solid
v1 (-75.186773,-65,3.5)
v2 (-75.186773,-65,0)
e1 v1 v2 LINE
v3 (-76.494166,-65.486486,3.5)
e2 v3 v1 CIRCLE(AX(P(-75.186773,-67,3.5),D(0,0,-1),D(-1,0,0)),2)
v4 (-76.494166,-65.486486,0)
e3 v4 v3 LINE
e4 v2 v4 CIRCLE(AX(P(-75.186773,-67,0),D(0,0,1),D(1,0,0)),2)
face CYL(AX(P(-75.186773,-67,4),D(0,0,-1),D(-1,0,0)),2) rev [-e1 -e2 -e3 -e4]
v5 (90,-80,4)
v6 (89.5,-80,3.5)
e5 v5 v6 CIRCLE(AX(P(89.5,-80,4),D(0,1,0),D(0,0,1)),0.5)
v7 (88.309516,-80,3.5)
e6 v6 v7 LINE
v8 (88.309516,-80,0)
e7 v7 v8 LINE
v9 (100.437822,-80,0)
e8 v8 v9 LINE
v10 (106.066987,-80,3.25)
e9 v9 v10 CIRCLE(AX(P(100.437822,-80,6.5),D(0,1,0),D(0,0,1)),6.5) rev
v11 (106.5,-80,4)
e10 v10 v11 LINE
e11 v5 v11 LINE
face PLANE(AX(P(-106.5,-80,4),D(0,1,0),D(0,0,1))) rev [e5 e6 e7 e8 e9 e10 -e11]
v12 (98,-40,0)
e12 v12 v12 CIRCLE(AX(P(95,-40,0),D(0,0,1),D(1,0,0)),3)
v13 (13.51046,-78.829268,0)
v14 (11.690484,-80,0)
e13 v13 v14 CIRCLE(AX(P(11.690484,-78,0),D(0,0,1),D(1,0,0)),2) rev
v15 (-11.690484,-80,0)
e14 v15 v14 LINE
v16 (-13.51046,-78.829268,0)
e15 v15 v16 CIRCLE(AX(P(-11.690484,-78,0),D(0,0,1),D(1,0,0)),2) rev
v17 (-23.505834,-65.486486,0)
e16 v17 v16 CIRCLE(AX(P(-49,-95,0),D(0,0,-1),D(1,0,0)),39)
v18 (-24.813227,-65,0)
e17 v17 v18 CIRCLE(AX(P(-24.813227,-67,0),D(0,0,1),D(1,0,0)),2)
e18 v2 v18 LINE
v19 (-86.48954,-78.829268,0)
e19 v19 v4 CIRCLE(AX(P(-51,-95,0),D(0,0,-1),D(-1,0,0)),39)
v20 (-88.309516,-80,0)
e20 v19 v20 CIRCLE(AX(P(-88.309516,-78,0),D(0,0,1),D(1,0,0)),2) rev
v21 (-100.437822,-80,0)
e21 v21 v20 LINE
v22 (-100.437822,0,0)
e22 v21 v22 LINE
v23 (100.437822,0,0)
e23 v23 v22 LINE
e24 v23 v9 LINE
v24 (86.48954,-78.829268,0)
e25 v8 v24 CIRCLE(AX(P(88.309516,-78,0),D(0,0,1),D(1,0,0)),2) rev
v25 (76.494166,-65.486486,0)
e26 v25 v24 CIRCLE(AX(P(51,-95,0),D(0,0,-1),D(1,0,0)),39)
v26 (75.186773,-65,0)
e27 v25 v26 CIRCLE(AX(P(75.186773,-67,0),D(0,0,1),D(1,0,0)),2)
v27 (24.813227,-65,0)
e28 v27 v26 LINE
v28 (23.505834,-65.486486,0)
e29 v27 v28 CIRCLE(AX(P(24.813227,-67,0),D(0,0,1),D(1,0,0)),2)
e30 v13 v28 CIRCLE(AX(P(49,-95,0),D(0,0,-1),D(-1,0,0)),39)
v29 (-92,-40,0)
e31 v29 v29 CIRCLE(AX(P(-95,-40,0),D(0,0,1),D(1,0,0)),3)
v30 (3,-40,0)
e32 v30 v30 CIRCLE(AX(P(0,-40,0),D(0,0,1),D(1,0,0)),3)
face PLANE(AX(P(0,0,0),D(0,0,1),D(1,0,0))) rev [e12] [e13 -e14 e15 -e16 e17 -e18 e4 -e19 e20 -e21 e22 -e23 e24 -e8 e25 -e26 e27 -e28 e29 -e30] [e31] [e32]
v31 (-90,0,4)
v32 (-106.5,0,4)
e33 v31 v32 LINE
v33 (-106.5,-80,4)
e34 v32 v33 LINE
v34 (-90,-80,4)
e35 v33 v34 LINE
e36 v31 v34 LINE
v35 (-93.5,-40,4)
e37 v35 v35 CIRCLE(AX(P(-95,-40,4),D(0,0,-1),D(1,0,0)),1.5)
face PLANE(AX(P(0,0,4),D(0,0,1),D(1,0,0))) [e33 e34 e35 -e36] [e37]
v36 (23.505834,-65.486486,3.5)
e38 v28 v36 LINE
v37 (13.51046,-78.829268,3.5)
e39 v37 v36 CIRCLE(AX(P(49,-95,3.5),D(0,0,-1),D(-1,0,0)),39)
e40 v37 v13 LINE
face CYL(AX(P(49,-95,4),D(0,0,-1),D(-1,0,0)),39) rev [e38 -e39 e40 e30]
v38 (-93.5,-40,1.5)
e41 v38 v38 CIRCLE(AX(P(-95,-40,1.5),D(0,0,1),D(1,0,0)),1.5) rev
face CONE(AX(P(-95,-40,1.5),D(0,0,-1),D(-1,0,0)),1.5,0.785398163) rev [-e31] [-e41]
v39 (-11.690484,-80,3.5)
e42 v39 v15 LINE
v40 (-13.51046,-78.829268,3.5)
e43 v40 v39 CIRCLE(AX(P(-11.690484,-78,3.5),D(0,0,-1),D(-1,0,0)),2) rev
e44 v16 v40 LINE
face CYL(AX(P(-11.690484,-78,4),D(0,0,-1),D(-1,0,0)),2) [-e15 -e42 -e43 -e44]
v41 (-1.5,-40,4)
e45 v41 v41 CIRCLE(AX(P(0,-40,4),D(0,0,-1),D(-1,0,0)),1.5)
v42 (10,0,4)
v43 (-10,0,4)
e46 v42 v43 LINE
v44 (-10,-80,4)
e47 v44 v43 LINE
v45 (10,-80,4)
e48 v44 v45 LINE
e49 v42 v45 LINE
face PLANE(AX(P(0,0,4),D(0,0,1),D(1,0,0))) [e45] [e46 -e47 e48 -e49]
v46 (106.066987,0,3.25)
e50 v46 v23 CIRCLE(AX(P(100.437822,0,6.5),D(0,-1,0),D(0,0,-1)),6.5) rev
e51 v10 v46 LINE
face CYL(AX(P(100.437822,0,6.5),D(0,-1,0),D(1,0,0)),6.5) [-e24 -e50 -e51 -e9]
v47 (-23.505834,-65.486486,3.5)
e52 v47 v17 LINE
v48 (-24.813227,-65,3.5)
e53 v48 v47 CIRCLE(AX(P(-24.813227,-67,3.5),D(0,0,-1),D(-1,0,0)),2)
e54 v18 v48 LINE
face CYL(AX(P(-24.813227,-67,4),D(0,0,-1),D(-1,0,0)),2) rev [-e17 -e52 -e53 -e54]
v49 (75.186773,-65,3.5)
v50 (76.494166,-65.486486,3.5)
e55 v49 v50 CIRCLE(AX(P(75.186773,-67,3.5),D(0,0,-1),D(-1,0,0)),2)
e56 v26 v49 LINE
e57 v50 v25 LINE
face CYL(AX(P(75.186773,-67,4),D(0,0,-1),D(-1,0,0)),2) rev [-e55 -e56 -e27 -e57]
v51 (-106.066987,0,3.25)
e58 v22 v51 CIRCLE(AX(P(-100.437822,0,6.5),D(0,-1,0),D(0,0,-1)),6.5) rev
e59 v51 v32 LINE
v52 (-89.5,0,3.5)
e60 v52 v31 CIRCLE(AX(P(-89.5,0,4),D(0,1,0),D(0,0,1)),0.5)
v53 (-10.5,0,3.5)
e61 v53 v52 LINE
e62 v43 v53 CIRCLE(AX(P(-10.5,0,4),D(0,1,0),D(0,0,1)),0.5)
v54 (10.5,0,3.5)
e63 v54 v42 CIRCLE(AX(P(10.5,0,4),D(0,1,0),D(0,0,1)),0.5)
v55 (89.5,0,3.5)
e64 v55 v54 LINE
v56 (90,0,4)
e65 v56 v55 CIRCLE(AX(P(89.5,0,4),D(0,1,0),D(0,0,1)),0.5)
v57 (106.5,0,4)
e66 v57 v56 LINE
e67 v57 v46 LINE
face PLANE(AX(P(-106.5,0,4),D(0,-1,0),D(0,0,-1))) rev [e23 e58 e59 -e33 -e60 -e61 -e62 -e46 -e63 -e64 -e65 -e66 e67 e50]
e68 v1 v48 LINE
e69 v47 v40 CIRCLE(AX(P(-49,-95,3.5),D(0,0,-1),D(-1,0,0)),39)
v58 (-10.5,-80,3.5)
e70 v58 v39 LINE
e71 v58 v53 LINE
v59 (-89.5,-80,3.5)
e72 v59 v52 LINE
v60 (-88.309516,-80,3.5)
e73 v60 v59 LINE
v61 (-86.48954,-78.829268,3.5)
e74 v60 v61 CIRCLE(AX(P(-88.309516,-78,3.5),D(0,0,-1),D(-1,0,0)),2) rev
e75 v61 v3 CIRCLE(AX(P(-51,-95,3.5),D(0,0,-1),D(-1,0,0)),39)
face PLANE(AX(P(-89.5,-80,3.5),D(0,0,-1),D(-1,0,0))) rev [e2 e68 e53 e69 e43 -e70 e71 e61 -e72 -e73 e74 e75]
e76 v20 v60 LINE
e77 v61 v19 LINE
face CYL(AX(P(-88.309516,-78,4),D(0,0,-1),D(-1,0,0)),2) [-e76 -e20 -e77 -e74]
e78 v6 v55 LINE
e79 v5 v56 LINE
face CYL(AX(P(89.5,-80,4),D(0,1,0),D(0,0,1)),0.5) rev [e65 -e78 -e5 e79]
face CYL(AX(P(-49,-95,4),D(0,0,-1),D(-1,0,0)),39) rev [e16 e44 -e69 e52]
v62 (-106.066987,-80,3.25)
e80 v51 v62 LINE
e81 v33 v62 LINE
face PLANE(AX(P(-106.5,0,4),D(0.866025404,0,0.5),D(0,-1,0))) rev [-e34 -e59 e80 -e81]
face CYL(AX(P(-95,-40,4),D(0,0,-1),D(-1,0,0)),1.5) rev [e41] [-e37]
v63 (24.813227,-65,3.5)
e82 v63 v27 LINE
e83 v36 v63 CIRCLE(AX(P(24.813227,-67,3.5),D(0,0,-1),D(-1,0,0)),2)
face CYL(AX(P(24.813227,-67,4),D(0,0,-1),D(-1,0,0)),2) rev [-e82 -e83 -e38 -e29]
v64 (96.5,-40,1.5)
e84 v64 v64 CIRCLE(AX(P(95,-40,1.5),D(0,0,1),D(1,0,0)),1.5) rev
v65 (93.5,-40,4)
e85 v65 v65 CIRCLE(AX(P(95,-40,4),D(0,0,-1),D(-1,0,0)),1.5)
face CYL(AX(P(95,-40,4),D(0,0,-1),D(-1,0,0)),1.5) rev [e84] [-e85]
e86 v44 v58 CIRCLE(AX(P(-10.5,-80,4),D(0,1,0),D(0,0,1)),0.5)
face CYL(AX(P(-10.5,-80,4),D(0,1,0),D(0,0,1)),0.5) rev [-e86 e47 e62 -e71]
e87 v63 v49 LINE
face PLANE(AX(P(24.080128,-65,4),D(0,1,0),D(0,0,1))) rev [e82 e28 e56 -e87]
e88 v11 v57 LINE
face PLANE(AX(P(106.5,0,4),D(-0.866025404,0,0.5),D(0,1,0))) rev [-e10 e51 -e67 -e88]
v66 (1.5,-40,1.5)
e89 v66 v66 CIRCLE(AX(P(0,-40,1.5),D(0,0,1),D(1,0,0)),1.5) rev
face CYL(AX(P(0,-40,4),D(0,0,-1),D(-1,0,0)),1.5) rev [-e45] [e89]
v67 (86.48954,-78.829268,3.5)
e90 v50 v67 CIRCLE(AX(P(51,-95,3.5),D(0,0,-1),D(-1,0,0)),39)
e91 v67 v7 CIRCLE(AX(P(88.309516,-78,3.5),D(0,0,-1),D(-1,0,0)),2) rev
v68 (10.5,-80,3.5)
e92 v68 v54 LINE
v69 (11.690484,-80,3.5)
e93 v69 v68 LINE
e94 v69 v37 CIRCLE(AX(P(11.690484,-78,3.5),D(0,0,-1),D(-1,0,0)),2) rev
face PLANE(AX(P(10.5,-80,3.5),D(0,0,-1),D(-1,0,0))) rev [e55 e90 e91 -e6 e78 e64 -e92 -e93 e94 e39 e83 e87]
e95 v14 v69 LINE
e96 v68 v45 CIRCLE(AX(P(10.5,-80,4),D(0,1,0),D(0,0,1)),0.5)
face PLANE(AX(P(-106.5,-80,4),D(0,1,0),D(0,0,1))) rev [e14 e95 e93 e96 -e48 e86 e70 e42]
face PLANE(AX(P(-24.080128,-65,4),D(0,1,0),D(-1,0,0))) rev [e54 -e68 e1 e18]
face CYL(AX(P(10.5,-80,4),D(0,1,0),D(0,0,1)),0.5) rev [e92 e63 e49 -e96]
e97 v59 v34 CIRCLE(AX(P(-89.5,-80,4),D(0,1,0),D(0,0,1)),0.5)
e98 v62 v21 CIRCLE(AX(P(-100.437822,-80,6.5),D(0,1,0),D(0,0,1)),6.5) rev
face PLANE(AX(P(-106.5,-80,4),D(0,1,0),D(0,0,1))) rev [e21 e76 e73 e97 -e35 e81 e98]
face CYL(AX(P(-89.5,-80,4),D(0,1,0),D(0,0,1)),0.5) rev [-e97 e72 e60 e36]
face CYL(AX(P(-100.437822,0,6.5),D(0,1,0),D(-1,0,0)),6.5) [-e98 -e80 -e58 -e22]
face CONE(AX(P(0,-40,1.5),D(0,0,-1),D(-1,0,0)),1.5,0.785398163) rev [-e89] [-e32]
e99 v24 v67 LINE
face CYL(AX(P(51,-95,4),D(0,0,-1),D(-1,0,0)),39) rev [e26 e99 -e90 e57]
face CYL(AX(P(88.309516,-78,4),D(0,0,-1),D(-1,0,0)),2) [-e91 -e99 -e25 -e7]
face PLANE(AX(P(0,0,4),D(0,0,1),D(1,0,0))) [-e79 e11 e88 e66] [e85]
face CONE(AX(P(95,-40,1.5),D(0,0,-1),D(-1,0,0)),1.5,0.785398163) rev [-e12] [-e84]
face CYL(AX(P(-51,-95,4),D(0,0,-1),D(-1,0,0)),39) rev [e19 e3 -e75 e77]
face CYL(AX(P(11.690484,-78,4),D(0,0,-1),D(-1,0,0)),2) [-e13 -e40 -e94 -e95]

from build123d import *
from OCP.BRepFilletAPI import BRepFilletAPI_MakeChamfer

# Parameters (mm, degrees)
ESQUISSE1_W             = 213
ESQUISSE1_H             = 80
BOSS_EXTRU_1_DEPTH      = 4
CHANFREIN1_SIZE         = 4
CHANFREIN1_SIZE_2       = 2.309401077
CONG_1_R                = 6.5
ESQUISSE2_R             = 1.5
ENL_V_MAT_EXTRU_1_DEPTH = 134.260084046
ENL_V_MAT_EXTRU_2_DEPTH = 134.260084046
CHANFREIN2_SIZE         = 1.5
ENL_V_MAT_EXTRU_3_DEPTH = 134.260084046
CONG_2_R                = 2


with BuildPart() as part:
    # Esquisse1 → Boss.-Extru.1 (new body)
    with BuildSketch(Plane.XY):
        with Locations((0, -40)):
            Rectangle(ESQUISSE1_W, ESQUISSE1_H)
    extrude(amount=BOSS_EXTRU_1_DEPTH)

    # Chanfrein1
    chanfrein1_edges_1 = [part.edges().sort_by_distance(p)[0] for p in [
        (-106.5, -40, 0),
    ]]
    chanfrein1_side_1 = [part.faces().sort_by_distance(p)[0] for p in [
        (-106.5, -40, 0.046188022),
    ]]
    chanfrein1_edges_2 = [part.edges().sort_by_distance(p)[0] for p in [
        (106.5, -40, 0),
    ]]
    chanfrein1_side_2 = [part.faces().sort_by_distance(p)[0] for p in [
        (106.5, -40, 0.046188022),
    ]]
    chanfrein1 = BRepFilletAPI_MakeChamfer(part.part.solid().wrapped)
    for e in chanfrein1_edges_1:
        chanfrein1.Add(CHANFREIN1_SIZE - 0.0001, CHANFREIN1_SIZE_2 - 0.0001, e.wrapped, chanfrein1_side_1[0].wrapped)
    for e in chanfrein1_edges_2:
        chanfrein1.Add(CHANFREIN1_SIZE - 0.0001, CHANFREIN1_SIZE_2 - 0.0001, e.wrapped, chanfrein1_side_2[0].wrapped)
    add(Compound.cast(chanfrein1.Shape()), mode=Mode.REPLACE)  # a hair under: the kernel refuses the full size

    # Congé1
    cong_1_edges = [part.edges().sort_by_distance(p)[0] for p in [
        (104.190698923, -40, 0),
        (-104.190698923, -40, 0),
    ]]
    fillet(cong_1_edges, radius=CONG_1_R)

    # Esquisse2 → Enlèv. mat.-Extru.1 (cut, through all)
    with BuildSketch(Plane(origin=(0, 0, 0), x_dir=(-1, 0, 0), z_dir=(0, 0, -1))):
        with Locations((-95, -40)):
            Circle(ESQUISSE2_R)
        with Locations(Location((95, -40, 0), (0, 0, 180))):
            Circle(ESQUISSE2_R)
        with Locations((0, -40)):
            Circle(ESQUISSE2_R)
    extrude(amount=-ENL_V_MAT_EXTRU_1_DEPTH, mode=Mode.SUBTRACT)

    # Esquisse3 → Enlèv. mat.-Extru.2 (cut, through all)
    with BuildSketch(Plane(origin=(0, 0, 0), x_dir=(1, 0, 0), z_dir=(0, 1, 0))):
        with BuildLine():
            Line((-89.5, -3.5), (-10.5, -3.5))
            ThreePointArc((-10.5, -3.5), (-10, -4), (-10.5, -4.5))
            Line((-10.5, -4.5), (-89.5, -4.5))
            ThreePointArc((-89.5, -4.5), (-90, -4), (-89.5, -3.5))
        make_face()
        with BuildLine():
            Line((10.5, -3.5), (89.5, -3.5))
            ThreePointArc((89.5, -3.5), (90, -4), (89.5, -4.5))
            Line((89.5, -4.5), (10.5, -4.5))
            ThreePointArc((10.5, -4.5), (10, -4), (10.5, -3.5))
        make_face()
    extrude(amount=-ENL_V_MAT_EXTRU_2_DEPTH, mode=Mode.SUBTRACT)

    # Chanfrein2
    chanfrein2_edges = [part.edges().sort_by_distance(p)[0] for p in [
        (96.5, -40, 0),
        (-96.5, -40, 0),
        (1.5, -40, 0),
    ]]
    chamfer(chanfrein2_edges, length=CHANFREIN2_SIZE)

    # Esquisse4 → Enlèv. mat.-Extru.3 (cut, through all)
    with BuildSketch(Plane(origin=(0, 0, 0), x_dir=(-1, 0, 0), z_dir=(0, 0, -1))):
        with BuildLine():
            Line((-87, -80), (-13, -80))
            ThreePointArc((-13, -80), (-17.630306208, -71.827984304), (-24.080128411, -65))
            Line((-24.080128411, -65), (-75.919871589, -65))
            ThreePointArc((-75.919871589, -65), (-82.369693792, -71.827984304), (-87, -80))
        make_face()
        with BuildLine():
            Line((87, -80), (13, -80))
            ThreePointArc((13, -80), (17.630306208, -71.827984304), (24.080128411, -65))
            Line((24.080128411, -65), (75.919871589, -65))
            ThreePointArc((75.919871589, -65), (82.369693792, -71.827984304), (87, -80))
        make_face()
    extrude(amount=-ENL_V_MAT_EXTRU_3_DEPTH, mode=Mode.SUBTRACT)

    # Congé2
    cong_2_edges = [part.edges().sort_by_distance(p)[0] for p in [
        (87, -80, 1.75),
        (75.919871589, -65, 1.75),
        (24.080128411, -65, 1.75),
        (13, -80, 1.75),
        (-75.919871589, -65, 1.75),
        (-87, -80, 1.75),
        (-13, -80, 1.75),
        (-24.080128411, -65, 1.75),
    ]]
    fillet(cong_2_edges, radius=CONG_2_R)


solid = part.part
